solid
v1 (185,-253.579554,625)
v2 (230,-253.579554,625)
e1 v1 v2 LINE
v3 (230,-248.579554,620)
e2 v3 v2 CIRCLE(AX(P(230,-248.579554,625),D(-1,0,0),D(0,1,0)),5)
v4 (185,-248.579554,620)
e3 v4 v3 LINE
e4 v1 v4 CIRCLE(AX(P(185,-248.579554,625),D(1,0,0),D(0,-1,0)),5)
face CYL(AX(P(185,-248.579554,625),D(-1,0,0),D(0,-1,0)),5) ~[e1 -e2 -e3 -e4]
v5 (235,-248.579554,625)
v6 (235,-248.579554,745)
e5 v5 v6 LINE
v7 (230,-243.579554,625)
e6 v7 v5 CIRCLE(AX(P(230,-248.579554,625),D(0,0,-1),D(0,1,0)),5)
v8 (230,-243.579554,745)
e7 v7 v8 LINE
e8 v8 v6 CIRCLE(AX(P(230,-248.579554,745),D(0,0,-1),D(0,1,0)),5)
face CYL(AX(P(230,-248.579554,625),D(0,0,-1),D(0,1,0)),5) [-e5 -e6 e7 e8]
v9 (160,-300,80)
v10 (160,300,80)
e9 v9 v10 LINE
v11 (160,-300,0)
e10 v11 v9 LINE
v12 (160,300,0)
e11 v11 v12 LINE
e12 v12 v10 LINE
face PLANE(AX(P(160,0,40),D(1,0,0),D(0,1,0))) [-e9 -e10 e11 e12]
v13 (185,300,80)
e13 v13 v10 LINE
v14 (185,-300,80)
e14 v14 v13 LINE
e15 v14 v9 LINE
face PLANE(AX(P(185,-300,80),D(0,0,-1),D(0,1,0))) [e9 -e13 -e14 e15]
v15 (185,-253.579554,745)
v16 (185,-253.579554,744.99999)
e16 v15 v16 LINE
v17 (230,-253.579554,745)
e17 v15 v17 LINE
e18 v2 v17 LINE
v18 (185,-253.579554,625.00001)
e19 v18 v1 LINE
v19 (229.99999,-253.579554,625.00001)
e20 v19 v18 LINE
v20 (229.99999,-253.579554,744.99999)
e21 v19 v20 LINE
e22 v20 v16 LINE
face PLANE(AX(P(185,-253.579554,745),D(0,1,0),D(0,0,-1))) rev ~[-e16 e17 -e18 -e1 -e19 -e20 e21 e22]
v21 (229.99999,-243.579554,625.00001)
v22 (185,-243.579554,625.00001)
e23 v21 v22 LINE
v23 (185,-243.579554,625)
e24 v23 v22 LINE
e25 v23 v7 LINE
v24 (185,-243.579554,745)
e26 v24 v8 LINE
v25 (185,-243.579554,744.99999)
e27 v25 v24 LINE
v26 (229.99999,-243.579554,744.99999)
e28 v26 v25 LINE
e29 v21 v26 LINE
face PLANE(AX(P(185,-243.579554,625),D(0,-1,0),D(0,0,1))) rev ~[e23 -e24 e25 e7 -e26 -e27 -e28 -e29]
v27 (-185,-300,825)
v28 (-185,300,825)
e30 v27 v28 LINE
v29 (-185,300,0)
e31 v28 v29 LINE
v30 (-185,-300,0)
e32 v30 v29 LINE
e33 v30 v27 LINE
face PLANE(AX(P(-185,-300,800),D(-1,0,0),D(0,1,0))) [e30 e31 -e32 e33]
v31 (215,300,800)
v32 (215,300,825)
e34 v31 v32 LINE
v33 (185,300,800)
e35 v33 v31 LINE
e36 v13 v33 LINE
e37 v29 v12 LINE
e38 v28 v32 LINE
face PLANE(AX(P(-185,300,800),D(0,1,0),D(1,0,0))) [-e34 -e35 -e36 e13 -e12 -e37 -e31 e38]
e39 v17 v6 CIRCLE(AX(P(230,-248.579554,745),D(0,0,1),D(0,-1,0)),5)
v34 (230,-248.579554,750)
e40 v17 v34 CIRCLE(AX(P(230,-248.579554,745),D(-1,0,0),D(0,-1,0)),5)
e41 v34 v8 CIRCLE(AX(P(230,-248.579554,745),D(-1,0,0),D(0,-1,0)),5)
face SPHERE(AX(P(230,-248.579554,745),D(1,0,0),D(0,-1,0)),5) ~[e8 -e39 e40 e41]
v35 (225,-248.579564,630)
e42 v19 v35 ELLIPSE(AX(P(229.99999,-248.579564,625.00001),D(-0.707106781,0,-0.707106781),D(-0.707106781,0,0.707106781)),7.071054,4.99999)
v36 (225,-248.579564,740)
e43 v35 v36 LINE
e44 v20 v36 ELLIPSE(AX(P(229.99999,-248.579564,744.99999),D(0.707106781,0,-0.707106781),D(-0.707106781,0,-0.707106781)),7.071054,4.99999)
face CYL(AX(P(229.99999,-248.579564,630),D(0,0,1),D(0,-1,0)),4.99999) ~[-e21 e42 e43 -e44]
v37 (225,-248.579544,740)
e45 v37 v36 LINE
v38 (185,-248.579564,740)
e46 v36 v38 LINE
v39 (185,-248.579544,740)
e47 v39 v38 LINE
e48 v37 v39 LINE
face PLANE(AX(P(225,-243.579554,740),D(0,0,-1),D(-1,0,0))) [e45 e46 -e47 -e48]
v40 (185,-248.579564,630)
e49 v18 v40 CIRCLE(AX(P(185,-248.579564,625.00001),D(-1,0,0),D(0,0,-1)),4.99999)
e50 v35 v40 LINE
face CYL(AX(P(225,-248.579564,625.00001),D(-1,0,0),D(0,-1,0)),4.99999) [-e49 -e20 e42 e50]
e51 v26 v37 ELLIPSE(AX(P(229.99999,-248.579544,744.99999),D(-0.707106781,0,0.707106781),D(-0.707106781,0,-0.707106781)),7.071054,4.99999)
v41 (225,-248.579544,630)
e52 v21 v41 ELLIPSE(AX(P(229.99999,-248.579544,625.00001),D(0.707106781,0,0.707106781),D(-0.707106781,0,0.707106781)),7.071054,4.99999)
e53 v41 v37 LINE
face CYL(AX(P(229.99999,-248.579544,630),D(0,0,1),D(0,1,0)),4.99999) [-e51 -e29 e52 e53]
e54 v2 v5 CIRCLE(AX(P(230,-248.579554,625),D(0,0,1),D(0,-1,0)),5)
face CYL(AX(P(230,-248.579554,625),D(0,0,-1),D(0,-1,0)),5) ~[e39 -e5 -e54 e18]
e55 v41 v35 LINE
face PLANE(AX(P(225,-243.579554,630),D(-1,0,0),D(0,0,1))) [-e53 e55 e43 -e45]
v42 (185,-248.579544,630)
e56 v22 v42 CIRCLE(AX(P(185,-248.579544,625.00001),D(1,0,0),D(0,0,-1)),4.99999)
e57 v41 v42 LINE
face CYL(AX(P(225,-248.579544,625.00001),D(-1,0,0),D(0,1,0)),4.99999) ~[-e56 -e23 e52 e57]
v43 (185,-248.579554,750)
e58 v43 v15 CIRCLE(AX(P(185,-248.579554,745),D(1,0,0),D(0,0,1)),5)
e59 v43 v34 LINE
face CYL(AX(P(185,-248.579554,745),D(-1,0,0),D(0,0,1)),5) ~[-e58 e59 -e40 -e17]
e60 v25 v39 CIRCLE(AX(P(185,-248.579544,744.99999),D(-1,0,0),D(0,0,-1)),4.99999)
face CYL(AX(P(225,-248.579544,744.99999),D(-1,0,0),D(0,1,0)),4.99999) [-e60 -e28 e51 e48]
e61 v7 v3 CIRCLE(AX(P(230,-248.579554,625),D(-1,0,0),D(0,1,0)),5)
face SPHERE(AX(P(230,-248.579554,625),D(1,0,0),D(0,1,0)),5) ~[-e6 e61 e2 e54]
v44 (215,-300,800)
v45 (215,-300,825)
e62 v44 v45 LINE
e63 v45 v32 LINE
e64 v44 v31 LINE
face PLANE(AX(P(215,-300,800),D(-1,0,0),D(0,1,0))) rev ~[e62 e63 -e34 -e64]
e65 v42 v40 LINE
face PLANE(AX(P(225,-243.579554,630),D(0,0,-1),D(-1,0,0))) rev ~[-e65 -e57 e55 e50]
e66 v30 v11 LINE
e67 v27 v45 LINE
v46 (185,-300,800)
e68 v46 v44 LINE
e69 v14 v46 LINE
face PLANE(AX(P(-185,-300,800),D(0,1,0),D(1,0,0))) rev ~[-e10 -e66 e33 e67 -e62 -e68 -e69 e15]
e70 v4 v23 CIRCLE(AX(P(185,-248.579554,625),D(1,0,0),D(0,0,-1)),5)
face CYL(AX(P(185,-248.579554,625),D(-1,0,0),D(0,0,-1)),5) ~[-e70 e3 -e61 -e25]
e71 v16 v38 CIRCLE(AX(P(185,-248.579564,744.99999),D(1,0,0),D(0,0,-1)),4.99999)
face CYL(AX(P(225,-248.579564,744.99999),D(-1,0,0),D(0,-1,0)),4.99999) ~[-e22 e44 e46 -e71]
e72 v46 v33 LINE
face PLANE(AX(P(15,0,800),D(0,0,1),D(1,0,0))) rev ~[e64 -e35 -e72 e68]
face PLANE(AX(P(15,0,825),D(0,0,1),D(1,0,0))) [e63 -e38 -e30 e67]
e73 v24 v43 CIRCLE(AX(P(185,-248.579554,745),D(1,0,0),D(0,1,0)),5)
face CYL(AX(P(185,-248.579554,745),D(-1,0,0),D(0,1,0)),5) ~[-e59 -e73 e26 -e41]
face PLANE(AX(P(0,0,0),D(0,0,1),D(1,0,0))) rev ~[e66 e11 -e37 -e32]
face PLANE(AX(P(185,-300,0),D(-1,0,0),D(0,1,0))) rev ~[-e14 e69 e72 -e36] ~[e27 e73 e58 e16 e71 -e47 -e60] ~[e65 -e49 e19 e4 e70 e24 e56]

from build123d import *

# Parameters (mm, degrees)
F0_W        = 370
F0_H        = 600
F1_DEPTH    = 800
F2_W        = 600
F2_H        = 80
F3_DEPTH    = 25
F5_DEPTH    = 50
F6_T1_DEPTH = 120
F6_T4_ANGLE = 180
F6_T6_ANGLE = 180
F7_W        = 40
F7_H        = 110
F8_DEPTH    = 25
F9_R        = 4.99999
F10_W       = 400
F10_H       = 600
F11_DEPTH   = 25


# Not quite as in the source:
# - a fillet or chamfer that OpenCascade refuses, or shapes differently, is made with other operations: its cross-section is extruded or revolved along the edge and cut away or added
# - a fillet or chamfer is up to 0.001 mm smaller than in the source, because OpenCascade refuses the exact size


with BuildPart() as f1:
    # F0 (on Top) → F1 (new body)
    with BuildSketch(Plane.XY):
        Rectangle(F0_W, F0_H)
    extrude(amount=F1_DEPTH)

    # F2 (on face) → F3 (cut)
    with BuildSketch(Plane.YZ.offset(185)):
        with Locations((0, 40)):
            Rectangle(F2_W, F2_H)
    extrude(amount=-F3_DEPTH, mode=Mode.SUBTRACT)

    # F4 (on face) → F5 (join)
    with BuildSketch(Plane.YZ.offset(185)):
        with BuildLine():
            ThreePointArc((-248.5795542598, 750), (-252.1150881657, 748.5355339059), (-253.5795542598, 745))
            Line((-253.5795542598, 745), (-253.5795542598, 625))
            ThreePointArc((-253.5795542598, 625), (-252.1150881657, 621.4644660941), (-248.5795542598, 620))
            ThreePointArc((-248.5795542598, 620), (-245.0440203538, 621.4644660941), (-243.5795542598, 625))
            Line((-243.5795542598, 625), (-243.5795542598, 745))
            ThreePointArc((-243.5795542598, 745), (-245.0440203538, 748.5355339059), (-248.5795542598, 750))
        make_face()
    extrude(amount=F5_DEPTH)

    # F6: fillet of radius 5 on 4 edges, made by hand

    # F6_s2 → F6_t1 (cut)
    with BuildSketch(Plane.XY.offset(625)):
        with BuildLine():
            ThreePointArc((230, -253.5795542598), (233.5355339059, -252.1150881657), (235, -248.5795542598))
            Line((235, -248.5795542598), (235, -253.5795542598))
            Line((235, -253.5795542598), (230, -253.5795542598))
        make_face()
        with BuildLine():
            ThreePointArc((230, -243.5795542598), (233.5355339059, -245.0440203538), (235, -248.5795542598))
            Line((235, -248.5795542598), (235, -243.5795542598))
            Line((235, -243.5795542598), (230, -243.5795542598))
        make_face()
    extrude(amount=F6_T1_DEPTH, mode=Mode.SUBTRACT)

    # F6_s3 → F6_t4 (revolve, cut)
    with BuildSketch(Plane.XY.offset(745)):
        with BuildLine():
            ThreePointArc((230, -253.5795542598), (233.5355339059, -252.1150881657), (235, -248.5795542598))
            Line((235, -248.5795542598), (235, -253.5795542598))
            Line((235, -253.5795542598), (230, -253.5795542598))
        make_face()
    revolve(axis=Axis((235, -248.5795542598, 745), (-1, 0, 0)), revolution_arc=F6_T4_ANGLE, mode=Mode.SUBTRACT)

    # F6_s5 → F6_t6 (revolve, cut)
    with BuildSketch(Plane.XY.offset(625)):
        with BuildLine():
            ThreePointArc((230, -243.5795542598), (233.5355339059, -245.0440203538), (235, -248.5795542598))
            Line((235, -248.5795542598), (235, -243.5795542598))
            Line((235, -243.5795542598), (230, -243.5795542598))
        make_face()
    revolve(axis=Axis((235, -248.5795542598, 625), (-1, 0, 0)), revolution_arc=F6_T6_ANGLE, mode=Mode.SUBTRACT)

    # F7 (on face) → F8 (cut)
    with BuildSketch(Plane(origin=(0, -243.5795542598, 0), x_dir=(-1, 0, 0), z_dir=(0, 1, 0))):
        with Locations((-205, 685)):
            Rectangle(F7_W, F7_H)
    extrude(amount=-F8_DEPTH, mode=Mode.SUBTRACT)

    # F9 (radius 5 in the source; OpenCascade refuses exactly that, so slightly less here)
    f9_edges = [f1.edges().sort_by_distance(p)[0] for p in [
        (205, -243.579554, 740),
        (225, -243.579554, 685),
        (205, -243.579554, 630),
        (205, -253.579554, 740),
        (225, -253.579554, 685),
        (205, -253.579554, 630),
    ]]
    fillet(f9_edges, radius=F9_R)

    # F10 (on face) → F11 (join)
    with BuildSketch(Plane.XY.offset(800)):
        with Locations((15, 0)):
            Rectangle(F10_W, F10_H)
    extrude(amount=F11_DEPTH)


solid = f1.part
